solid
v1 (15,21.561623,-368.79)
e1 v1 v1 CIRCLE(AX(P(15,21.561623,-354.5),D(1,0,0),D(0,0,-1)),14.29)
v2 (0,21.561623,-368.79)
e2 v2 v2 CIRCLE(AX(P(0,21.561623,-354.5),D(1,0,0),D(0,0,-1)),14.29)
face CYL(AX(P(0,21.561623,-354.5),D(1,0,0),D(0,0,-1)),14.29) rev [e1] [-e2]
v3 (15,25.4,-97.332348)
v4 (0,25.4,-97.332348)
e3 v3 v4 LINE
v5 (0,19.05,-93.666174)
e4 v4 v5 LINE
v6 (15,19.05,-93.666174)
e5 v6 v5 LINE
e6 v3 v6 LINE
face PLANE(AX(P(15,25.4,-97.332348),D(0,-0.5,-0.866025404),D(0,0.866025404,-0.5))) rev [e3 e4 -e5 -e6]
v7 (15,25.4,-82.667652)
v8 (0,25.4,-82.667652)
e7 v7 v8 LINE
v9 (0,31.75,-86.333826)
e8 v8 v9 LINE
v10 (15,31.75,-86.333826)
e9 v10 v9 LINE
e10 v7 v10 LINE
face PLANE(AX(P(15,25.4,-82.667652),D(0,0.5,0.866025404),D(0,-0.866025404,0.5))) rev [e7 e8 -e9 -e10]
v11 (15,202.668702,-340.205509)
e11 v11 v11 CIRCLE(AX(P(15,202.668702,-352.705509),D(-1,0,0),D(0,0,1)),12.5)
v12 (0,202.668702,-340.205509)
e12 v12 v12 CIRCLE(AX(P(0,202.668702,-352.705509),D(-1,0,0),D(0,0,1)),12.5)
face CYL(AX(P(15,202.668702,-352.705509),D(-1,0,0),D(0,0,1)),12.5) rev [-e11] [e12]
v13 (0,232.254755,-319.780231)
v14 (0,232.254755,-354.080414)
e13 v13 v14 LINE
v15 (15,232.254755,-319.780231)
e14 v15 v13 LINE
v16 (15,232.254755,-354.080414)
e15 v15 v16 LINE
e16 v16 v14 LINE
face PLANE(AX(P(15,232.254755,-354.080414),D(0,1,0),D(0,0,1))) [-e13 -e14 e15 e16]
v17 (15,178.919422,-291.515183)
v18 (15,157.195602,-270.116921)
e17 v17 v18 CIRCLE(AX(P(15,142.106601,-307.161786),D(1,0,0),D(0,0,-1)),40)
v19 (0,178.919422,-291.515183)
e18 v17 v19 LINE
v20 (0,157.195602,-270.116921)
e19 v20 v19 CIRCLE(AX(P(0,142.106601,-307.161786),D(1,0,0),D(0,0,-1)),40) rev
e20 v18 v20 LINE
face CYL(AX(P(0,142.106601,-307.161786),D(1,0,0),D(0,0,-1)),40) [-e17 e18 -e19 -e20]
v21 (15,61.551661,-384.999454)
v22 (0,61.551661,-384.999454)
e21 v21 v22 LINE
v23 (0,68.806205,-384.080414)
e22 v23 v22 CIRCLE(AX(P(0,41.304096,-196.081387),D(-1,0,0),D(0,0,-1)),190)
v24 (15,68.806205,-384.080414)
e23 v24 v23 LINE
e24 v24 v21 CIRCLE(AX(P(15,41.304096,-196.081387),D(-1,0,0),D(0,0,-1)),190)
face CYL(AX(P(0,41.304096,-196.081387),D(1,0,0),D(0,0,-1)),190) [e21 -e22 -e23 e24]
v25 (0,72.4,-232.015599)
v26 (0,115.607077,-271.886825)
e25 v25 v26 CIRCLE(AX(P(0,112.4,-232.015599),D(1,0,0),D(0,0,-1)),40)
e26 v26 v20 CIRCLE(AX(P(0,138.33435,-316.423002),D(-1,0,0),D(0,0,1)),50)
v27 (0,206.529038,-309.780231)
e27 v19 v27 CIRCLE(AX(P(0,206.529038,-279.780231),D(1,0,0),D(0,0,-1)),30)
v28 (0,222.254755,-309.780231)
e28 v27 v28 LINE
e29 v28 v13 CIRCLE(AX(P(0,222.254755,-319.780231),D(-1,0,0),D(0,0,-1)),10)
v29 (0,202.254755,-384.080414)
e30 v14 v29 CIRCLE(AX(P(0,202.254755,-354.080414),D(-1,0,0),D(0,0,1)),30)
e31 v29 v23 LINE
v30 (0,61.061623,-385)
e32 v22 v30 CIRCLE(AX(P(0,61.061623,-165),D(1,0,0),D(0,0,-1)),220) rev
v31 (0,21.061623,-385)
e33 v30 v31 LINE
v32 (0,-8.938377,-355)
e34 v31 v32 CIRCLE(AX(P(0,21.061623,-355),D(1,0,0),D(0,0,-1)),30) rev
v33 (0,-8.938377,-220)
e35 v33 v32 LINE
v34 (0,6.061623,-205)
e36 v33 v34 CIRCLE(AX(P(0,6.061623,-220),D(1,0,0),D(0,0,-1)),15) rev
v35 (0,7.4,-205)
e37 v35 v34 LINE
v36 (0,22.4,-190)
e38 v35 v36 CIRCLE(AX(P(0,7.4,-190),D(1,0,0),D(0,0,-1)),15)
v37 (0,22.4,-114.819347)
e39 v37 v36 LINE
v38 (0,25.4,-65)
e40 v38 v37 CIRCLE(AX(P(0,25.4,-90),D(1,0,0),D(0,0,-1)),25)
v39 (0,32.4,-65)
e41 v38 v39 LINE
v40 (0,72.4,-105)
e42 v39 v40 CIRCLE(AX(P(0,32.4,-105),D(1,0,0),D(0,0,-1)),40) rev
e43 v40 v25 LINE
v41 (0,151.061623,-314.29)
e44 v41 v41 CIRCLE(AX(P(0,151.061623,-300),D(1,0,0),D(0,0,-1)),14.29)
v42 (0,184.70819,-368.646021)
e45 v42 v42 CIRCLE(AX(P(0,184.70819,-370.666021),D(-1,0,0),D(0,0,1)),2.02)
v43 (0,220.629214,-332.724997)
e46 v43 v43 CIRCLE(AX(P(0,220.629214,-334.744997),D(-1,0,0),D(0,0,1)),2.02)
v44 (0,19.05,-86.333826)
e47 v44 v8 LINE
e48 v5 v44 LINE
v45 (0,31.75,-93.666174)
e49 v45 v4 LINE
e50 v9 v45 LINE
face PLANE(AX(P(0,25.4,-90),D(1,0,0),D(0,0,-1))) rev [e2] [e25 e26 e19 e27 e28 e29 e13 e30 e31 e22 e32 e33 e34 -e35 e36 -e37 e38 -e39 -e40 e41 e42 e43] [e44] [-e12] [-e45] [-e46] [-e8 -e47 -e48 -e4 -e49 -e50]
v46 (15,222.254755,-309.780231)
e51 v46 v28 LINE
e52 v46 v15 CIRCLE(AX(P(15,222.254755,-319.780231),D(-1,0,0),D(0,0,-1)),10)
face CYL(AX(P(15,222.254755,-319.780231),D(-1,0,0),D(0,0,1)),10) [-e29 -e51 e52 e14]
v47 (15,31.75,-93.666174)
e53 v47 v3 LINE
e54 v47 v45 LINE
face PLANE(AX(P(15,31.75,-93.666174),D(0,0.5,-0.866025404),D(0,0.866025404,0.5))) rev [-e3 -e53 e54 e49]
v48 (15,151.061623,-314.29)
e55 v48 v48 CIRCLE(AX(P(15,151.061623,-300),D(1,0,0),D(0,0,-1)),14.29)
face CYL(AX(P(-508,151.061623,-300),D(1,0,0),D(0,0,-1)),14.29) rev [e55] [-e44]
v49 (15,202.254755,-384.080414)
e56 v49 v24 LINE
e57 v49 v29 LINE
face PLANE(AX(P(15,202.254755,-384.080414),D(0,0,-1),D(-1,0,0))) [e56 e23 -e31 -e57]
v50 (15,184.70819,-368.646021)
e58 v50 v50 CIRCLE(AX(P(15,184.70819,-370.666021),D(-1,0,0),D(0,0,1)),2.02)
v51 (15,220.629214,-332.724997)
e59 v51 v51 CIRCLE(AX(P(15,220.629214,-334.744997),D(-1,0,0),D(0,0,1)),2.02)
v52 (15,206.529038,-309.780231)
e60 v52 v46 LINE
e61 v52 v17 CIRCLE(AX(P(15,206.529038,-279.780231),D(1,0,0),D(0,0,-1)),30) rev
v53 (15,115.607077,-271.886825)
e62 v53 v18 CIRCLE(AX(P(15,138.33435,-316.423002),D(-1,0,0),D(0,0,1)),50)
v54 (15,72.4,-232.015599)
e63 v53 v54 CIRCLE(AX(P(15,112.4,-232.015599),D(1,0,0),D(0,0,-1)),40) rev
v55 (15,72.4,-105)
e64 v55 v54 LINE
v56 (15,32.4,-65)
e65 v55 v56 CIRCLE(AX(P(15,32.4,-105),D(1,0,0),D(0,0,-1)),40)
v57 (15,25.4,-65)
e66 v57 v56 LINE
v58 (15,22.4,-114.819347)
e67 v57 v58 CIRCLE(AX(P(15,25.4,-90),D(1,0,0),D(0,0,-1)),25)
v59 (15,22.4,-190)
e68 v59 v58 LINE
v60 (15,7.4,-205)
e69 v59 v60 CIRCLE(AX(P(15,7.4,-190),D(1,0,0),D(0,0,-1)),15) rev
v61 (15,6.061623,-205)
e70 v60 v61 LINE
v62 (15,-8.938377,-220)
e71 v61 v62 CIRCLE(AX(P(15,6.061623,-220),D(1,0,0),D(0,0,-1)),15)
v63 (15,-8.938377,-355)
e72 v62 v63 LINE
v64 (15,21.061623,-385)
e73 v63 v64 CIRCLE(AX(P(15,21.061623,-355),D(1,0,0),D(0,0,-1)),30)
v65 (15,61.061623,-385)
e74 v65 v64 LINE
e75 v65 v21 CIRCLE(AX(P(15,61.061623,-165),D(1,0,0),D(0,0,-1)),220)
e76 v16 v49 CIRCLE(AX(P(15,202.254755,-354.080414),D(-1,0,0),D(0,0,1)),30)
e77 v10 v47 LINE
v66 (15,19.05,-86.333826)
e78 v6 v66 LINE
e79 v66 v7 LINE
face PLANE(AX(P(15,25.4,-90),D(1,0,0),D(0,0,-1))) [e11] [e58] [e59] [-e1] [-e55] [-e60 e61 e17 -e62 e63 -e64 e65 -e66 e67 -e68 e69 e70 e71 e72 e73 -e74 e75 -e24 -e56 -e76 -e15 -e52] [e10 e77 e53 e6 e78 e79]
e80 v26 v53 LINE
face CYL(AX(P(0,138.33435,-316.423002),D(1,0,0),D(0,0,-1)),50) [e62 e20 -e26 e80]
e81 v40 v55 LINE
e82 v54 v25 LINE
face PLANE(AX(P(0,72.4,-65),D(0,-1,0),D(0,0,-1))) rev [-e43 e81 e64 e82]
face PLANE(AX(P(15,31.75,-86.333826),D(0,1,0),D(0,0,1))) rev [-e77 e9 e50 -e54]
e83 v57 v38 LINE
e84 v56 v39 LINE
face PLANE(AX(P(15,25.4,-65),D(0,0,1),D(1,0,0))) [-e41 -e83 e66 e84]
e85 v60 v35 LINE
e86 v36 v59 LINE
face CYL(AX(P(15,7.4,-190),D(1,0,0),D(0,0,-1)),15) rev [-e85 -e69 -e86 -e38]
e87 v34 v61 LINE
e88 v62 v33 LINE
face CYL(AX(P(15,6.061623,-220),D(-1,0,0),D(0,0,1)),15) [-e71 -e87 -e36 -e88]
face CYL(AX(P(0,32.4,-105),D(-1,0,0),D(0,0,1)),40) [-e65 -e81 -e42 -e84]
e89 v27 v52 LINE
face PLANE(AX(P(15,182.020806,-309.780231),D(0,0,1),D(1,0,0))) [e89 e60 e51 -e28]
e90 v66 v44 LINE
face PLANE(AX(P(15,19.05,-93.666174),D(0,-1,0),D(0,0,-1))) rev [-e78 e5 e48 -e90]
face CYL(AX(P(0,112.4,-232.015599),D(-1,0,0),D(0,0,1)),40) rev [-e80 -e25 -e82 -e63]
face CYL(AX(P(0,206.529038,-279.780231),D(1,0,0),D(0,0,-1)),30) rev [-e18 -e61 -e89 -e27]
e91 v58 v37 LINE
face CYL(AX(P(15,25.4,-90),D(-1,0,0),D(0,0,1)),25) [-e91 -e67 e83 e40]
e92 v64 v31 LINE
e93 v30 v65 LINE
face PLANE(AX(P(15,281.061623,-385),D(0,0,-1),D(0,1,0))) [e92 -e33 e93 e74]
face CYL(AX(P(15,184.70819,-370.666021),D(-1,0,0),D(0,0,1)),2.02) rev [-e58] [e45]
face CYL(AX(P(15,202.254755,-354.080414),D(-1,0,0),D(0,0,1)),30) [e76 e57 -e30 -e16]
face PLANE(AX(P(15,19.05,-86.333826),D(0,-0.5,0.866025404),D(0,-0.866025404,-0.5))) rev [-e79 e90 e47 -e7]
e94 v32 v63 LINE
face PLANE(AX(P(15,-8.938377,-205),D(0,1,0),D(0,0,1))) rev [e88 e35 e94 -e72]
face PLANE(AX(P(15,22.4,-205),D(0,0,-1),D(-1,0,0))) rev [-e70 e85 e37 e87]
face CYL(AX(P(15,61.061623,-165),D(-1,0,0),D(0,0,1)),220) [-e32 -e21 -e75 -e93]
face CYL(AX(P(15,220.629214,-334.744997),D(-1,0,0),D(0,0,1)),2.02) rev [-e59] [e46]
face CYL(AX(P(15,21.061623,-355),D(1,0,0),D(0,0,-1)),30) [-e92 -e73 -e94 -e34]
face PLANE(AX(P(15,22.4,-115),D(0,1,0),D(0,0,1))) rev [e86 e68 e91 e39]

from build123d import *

# Parameters (mm, degrees)
SALIENTE_EXTRUIR1_DEPTH = 15
CORTAR_EXTRUIR1_DEPTH   = 477.91260816
REDONDEO1_R             = 220
REDONDEO2_R             = 70
REDONDEO3_R             = 15
REDONDEO4_R             = 30
CROQUIS7_R              = 14.29
CORTAR_EXTRUIR5_DEPTH   = 477.91260816
CROQUIS8_R              = 14.29
CORTAR_EXTRUIR6_DEPTH   = 523
CORTAR_EXTRUIR12_DEPTH  = 477.91260816
REDONDEO5_R             = 40
CORTAR_EXTRUIR13_DEPTH  = 429.85874997
REDONDEO6_R             = 40
SALIENTE_EXTRUIR3_DEPTH = 15
SALIENTE_EXTRUIR4_DEPTH = 15
CROQUIS21_R             = 2.02
CROQUIS21_R_2           = 12.5
CORTAR_EXTRUIR17_DEPTH  = 450.880285455
REDONDEO7_R             = 30


with BuildPart() as part:
    # Croquis1 → Saliente-Extruir1 (new body)
    with BuildSketch(Plane(origin=(0, 0, 0), x_dir=(0, 0, -1), z_dir=(1, 0, 0))):
        with BuildLine():
            Line((65, 25.4), (65, 281.06162282))
            Line((65, 281.06162282), (385, 281.06162282))
            Line((385, 281.06162282), (385, -8.93837718))
            Line((385, -8.93837718), (205, -8.93837718))
            Line((205, -8.93837718), (205, 22.4))
            Line((205, 22.4), (115, 22.4))
            Line((115, 22.4), (114.819347292, 22.4))
            ThreePointArc((114.819347292, 22.4), (88.497282844, 0.445204045), (65, 25.4))
        make_face()
    extrude(amount=SALIENTE_EXTRUIR1_DEPTH)

    # Croquis2 → Cortar-Extruir1 (cut, through all)
    with BuildSketch(Plane.ZY):
        Polygon((-82.667651581, 25.4), (-86.333825791, 31.75), (-93.666174209, 31.75), (-97.332348419, 25.4), (-93.666174209, 19.05), (-86.333825791, 19.05), align=None)
    extrude(amount=-CORTAR_EXTRUIR1_DEPTH, mode=Mode.SUBTRACT)

    # Redondeo1
    redondeo1_edges = [part.edges().sort_by_distance(p)[0] for p in [
        (7.5, 281.06162282, -385),
    ]]
    fillet(redondeo1_edges, radius=REDONDEO1_R)

    # Redondeo2
    redondeo2_edges = [part.edges().sort_by_distance(p)[0] for p in [
        (7.5, 281.06162282, -65),
    ]]
    fillet(redondeo2_edges, radius=REDONDEO2_R)

    # Redondeo3
    redondeo3_edges = [part.edges().sort_by_distance(p)[0] for p in [
        (7.5, -8.93837718, -205),
        (7.5, 22.4, -205),
    ]]
    fillet(redondeo3_edges, radius=REDONDEO3_R)

    # Redondeo4
    redondeo4_edges = [part.edges().sort_by_distance(p)[0] for p in [
        (7.5, -8.93837718, -385),
    ]]
    fillet(redondeo4_edges, radius=REDONDEO4_R)

    # Croquis7 → Cortar-Extruir5 (cut, through all)
    with BuildSketch(Plane(origin=(15, 0, 0), x_dir=(0, 0, -1), z_dir=(1, 0, 0))):
        with Locations((354.499999998, 21.561622823)):
            Circle(CROQUIS7_R)
    extrude(amount=-CORTAR_EXTRUIR5_DEPTH, mode=Mode.SUBTRACT)

    # Croquis8 → Cortar-Extruir6 (cut)
    with BuildSketch(Plane(origin=(15, 0, 0), x_dir=(0, 0, -1), z_dir=(1, 0, 0))):
        with Locations((299.999999998, 151.061622823)):
            Circle(CROQUIS8_R)
    extrude(amount=-CORTAR_EXTRUIR6_DEPTH, mode=Mode.SUBTRACT)

    # Croquis14 → Cortar-Extruir12 (cut, through all)
    with BuildSketch(Plane(origin=(15, 0, 0), x_dir=(0, 0, -1), z_dir=(1, 0, 0))):
        with BuildLine():
            Line((65, 72.4), (270, 72.4))
            ThreePointArc((270, 72.4), (274.363902477, 93.8541681), (271.886825139, 115.607077367))
            ThreePointArc((271.886825139, 115.607077367), (293.695729554, 182.870527237), (360.959179423, 161.06162282))
            Line((360.959179423, 161.06162282), (409.037931036, 257.33581614))
            Line((409.037931036, 257.33581614), (105.335360325, 302.08857435))
            Line((105.335360325, 302.08857435), (0, 212.58305793))
            Line((0, 212.58305793), (65, 72.4))
        make_face()
    extrude(amount=-CORTAR_EXTRUIR12_DEPTH, mode=Mode.SUBTRACT)

    # Redondeo5
    # the kernel refuses this fillet: 40 mm, written as the material it adds along each edge
    with BuildSketch(Plane(origin=(15, 72.4, -270), x_dir=(0, 0.9990478553762716, -0.0436277740444352), z_dir=(-1, 0, 0))) as redondeo5_piece_1:
        with BuildLine():
            CenterArc((38.304739361, -39.69334508), REDONDEO5_R, 82.900783034, 94.598735986)
            Line((-1.657174854, -37.948234118), (0, 0))
            ThreePointArc((0, 0), (21.624127981, 3.423749812), (43.248255961, 0))
        make_face()
    extrude(amount=15)
    # the kernel refuses this fillet: 40 mm, written as the material it takes off along each edge
    with BuildSketch(Plane(origin=(115, 72.4, -65), x_dir=(0, 0, -1), z_dir=(-1, 0, 0))) as redondeo5_2_piece_1:
        with BuildLine():
            CenterArc((REDONDEO5_R, REDONDEO5_R), REDONDEO5_R, 180, 90)
            Line((0, REDONDEO5_R), (0, 0))
            Line((0, 0), (REDONDEO5_R, 0))
        make_face()
    extrude(amount=215, mode=Mode.SUBTRACT)

    # Croquis15 → Cortar-Extruir13 (cut, through all)
    with BuildSketch(Plane(origin=(15, 0, 0), x_dir=(0, 0, -1), z_dir=(1, 0, 0))):
        with BuildLine():
            Line((316.423002092, 188.334350095), (358.626196651, 190.922485323))
            Line((358.626196651, 190.922485323), (422.761195779, 101.20409943))
            Line((422.761195779, 101.20409943), (385, 21.06162282))
            ThreePointArc((385, 21.06162282), (371.881027209, 113.376882145), (316.423002092, 188.334350095))
        make_face()
    extrude(amount=-CORTAR_EXTRUIR13_DEPTH, mode=Mode.SUBTRACT)

    # Redondeo6
    # the kernel refuses this fillet: 40 mm, written as the material it takes off along each edge
    with BuildSketch(Plane(origin=(154.505258901, 188.334350095, -316.423002092), x_dir=(0, -0.5580210387188341, 0.8298268014153035), z_dir=(-1, 0, 0))) as redondeo6_piece_1:
        with BuildLine():
            CenterArc((33.481262136, -33.19307214), REDONDEO6_R, 56.080950646, 115.615192876)
            ThreePointArc((-6.099380682, -27.416159984), (-3.556977801, -13.59522176), (0, 0))
            ThreePointArc((0, 0), (27.90105178, 8.508659825), (55.802103561, 0))
        make_face()
    extrude(amount=294.010517803, mode=Mode.SUBTRACT)

    # Croquis18 → Saliente-Extruir3 (add, through all)
    with BuildSketch(Plane.ZY):
        with BuildLine():
            Line((-336.783225667, 168.987268689), (-324.9259333, 170.954067241))
            Line((-324.9259333, 170.954067241), (-309.780230989, 182.020805528))
            ThreePointArc((-309.780230989, 182.020805528), (-329.588467491, 188.570394011), (-336.783225667, 168.987268689))
        make_face()
    extrude(amount=-SALIENTE_EXTRUIR3_DEPTH)

    # Croquis20 → Saliente-Extruir4 (add, through all)
    with BuildSketch(Plane.ZY):
        with BuildLine():
            Line((-384.080413654, 202.254755045), (-384.080413654, 68.806205343))
            Line((-384.080413654, 68.806205343), (-355.955719628, 128.198236155))
            Line((-355.955719628, 128.198236155), (-350.988918253, 138.686827429))
            Line((-350.988918253, 138.686827429), (-333.391481861, 167.902196457))
            Line((-333.391481861, 167.902196457), (-333.391481861, 179.145496263))
            Line((-333.391481861, 179.145496263), (-331.848601066, 185.40903393))
            Line((-331.848601066, 185.40903393), (-327.722665886, 187.904048047))
            Line((-327.722665886, 187.904048047), (-321.465563641, 187.904048047))
            Line((-321.465563641, 187.904048047), (-315.23558207, 184.151512718))
            Line((-315.23558207, 184.151512718), (-309.780230989, 182.020805528))
            Line((-309.780230989, 182.020805528), (-309.780230989, 222.254755045))
            ThreePointArc((-309.780230989, 222.254755045), (-312.709163177, 229.325822857), (-319.780230989, 232.254755045))
            Line((-319.780230989, 232.254755045), (-354.080413654, 232.254755045))
            ThreePointArc((-354.080413654, 232.254755045), (-375.293617089, 223.467958481), (-384.080413654, 202.254755045))
        make_face()
    extrude(amount=-SALIENTE_EXTRUIR4_DEPTH)

    # Croquis21 → Cortar-Extruir17 (cut, through all)
    with BuildSketch(Plane.ZY):
        with Locations((-334.74499674, 220.62921413)):
            Circle(CROQUIS21_R)
        with Locations((-370.666021225, 184.708189645)):
            Circle(CROQUIS21_R)
        with Locations((-352.705508983, 202.668701887)):
            Circle(CROQUIS21_R_2)
    extrude(amount=-CORTAR_EXTRUIR17_DEPTH, mode=Mode.SUBTRACT)

    # Redondeo7
    redondeo7_edges = [part.edges().sort_by_distance(p)[0] for p in [
        (7.5, 182.020805528, -309.780230989),
    ]]
    fillet(redondeo7_edges, radius=REDONDEO7_R)


solid = part.part
